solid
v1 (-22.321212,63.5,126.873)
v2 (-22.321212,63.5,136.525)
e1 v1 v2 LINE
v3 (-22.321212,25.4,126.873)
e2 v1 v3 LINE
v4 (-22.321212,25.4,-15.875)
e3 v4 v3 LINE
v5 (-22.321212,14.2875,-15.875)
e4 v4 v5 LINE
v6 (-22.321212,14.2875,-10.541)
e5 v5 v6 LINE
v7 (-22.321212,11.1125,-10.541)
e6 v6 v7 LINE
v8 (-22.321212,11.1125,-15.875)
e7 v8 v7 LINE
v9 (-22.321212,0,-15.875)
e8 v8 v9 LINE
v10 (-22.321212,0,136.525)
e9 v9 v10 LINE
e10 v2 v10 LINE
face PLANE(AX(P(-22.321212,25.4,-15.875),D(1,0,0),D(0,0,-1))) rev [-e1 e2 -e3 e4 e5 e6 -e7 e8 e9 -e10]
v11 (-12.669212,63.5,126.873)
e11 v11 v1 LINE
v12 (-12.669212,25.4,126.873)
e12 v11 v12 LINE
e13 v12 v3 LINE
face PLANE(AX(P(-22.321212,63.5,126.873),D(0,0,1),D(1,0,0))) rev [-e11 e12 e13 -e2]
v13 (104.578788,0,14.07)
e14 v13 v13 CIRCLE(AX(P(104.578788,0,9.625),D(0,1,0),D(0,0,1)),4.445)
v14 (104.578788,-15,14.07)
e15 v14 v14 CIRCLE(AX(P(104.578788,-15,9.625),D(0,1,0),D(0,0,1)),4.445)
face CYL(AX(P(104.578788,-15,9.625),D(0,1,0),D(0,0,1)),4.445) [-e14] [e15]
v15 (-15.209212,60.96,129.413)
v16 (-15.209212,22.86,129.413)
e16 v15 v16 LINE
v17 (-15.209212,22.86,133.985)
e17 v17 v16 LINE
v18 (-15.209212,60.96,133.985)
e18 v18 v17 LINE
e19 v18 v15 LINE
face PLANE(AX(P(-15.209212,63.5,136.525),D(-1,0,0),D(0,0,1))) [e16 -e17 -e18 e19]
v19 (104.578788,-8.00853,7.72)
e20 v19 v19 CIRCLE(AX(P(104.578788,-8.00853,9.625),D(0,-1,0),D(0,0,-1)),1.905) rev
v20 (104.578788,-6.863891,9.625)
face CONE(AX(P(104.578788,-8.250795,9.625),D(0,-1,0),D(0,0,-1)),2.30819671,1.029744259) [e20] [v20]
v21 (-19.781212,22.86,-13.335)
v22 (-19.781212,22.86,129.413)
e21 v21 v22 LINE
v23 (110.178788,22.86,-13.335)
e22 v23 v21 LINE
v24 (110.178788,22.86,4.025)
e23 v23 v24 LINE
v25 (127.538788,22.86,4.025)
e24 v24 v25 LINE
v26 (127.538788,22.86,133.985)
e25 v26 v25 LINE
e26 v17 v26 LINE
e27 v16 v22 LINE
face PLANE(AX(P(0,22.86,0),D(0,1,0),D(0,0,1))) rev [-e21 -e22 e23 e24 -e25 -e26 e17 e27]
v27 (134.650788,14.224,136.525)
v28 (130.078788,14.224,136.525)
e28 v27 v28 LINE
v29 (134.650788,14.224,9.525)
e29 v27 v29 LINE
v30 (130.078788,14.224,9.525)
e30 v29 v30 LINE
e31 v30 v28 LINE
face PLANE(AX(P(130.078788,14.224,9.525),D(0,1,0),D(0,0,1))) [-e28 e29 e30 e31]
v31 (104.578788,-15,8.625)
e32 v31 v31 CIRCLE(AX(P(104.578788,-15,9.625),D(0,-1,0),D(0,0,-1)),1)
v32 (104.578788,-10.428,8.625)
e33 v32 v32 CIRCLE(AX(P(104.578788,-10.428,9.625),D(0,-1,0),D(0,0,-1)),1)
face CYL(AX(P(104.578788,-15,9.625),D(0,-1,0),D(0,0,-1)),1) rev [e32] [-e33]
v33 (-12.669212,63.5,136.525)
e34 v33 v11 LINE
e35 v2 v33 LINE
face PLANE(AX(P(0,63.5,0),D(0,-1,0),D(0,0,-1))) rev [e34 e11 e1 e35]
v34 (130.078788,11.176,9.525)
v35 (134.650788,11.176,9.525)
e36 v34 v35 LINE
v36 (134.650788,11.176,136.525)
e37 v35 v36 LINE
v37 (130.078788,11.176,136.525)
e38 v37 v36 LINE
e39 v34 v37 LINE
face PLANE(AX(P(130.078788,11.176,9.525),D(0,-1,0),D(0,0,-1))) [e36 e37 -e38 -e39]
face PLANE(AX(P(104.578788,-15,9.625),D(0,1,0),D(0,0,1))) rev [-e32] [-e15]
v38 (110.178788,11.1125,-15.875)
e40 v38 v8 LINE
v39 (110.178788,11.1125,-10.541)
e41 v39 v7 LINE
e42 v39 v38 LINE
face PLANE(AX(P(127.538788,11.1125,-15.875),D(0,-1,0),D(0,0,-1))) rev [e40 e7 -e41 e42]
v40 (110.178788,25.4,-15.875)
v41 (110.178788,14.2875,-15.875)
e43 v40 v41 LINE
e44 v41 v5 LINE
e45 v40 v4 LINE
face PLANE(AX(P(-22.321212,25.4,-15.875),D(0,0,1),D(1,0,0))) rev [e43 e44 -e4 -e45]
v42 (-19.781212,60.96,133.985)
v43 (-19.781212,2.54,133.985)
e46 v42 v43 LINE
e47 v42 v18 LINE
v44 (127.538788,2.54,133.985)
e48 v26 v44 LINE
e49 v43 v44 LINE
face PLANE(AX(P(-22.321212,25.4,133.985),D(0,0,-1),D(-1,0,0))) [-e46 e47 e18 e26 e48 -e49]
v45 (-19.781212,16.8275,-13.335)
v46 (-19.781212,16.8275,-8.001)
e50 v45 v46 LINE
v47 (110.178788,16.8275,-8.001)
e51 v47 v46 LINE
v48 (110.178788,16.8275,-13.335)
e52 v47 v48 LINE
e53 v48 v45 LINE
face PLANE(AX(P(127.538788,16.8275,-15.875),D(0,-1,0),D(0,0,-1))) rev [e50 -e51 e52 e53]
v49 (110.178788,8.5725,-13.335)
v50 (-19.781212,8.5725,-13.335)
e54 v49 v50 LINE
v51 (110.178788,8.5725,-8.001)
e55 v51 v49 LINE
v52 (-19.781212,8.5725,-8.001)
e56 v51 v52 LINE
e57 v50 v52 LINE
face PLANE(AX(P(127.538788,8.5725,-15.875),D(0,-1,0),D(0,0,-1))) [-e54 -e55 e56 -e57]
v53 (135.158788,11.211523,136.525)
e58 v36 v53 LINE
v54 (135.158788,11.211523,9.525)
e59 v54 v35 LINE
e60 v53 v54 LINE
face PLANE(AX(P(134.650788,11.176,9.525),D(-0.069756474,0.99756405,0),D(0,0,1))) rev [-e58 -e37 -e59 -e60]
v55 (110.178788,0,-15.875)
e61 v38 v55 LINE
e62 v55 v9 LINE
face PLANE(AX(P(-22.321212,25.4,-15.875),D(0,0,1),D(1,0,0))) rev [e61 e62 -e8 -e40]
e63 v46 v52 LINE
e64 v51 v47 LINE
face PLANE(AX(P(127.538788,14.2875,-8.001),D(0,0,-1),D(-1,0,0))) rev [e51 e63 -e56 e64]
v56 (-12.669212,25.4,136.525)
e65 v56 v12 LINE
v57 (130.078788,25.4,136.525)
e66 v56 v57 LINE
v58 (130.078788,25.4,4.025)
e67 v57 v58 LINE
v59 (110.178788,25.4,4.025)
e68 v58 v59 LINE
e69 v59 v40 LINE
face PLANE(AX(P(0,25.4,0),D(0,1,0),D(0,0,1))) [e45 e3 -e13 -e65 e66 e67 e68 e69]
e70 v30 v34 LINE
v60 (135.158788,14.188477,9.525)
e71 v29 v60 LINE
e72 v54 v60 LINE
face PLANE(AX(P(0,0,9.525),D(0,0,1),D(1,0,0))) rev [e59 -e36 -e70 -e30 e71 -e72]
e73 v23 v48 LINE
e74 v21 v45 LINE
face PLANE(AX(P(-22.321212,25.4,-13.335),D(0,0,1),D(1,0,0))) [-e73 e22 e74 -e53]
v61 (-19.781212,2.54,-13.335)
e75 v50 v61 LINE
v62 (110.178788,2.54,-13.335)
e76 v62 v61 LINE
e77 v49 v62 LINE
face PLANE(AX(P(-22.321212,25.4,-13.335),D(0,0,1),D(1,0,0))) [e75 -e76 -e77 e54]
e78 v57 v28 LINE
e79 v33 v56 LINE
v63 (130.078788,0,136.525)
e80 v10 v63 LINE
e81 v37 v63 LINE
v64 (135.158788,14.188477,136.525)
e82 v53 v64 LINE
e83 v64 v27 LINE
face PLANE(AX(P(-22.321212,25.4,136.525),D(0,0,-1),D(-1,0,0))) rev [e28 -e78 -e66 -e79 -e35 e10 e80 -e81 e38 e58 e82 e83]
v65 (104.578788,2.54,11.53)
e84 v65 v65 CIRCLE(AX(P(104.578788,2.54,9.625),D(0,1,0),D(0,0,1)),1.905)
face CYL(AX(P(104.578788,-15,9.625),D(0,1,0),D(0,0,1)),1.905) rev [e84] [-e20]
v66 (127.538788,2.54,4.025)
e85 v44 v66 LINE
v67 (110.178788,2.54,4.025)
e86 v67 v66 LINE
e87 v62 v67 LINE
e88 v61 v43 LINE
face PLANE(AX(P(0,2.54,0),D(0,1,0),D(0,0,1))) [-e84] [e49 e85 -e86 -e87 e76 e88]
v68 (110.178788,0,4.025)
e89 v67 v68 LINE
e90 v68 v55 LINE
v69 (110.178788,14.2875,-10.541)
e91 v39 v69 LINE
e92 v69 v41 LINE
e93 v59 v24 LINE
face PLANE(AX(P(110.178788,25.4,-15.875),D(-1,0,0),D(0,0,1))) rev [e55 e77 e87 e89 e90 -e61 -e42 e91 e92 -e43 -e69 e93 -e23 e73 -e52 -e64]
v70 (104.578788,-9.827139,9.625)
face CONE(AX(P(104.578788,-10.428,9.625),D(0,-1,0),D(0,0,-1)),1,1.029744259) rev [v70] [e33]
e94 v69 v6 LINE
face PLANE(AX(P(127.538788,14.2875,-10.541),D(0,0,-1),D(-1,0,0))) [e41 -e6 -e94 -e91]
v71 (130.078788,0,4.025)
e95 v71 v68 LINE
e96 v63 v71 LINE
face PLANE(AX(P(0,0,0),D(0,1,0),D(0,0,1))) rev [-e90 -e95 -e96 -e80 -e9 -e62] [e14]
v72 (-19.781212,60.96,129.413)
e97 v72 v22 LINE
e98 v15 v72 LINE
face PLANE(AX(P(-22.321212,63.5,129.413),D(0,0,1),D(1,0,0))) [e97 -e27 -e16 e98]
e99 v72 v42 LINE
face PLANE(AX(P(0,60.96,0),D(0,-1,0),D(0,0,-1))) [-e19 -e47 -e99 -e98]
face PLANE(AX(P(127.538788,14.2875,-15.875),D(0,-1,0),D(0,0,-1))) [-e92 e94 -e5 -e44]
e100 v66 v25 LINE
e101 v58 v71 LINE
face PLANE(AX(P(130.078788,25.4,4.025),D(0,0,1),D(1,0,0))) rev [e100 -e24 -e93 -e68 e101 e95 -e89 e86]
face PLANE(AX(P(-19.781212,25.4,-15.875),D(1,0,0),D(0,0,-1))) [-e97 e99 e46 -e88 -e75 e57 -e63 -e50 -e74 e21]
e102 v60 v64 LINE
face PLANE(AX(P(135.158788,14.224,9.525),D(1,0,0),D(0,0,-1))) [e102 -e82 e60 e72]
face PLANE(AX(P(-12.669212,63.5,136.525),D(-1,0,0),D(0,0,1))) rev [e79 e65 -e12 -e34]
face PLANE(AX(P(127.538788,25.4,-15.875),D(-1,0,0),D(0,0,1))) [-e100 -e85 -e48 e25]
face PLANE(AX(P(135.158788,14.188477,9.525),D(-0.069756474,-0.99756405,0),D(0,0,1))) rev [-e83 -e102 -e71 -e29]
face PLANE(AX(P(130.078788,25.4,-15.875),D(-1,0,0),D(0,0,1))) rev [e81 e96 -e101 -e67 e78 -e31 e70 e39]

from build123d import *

# Parameters (mm, degrees)
SKETCH1_W                 = 152.4
SKETCH1_H                 = 152.4
BOSS_EXTRUDE2_DEPTH       = 25.4
SKETCH2_W                 = 9.652
SKETCH2_H                 = 9.652
BOSS_EXTRUDE3_DEPTH       = 38.1
SKETCH3_W                 = 5.08
SKETCH3_H                 = 3.048
BOSS_EXTRUDE4_DEPTH       = 127
CHAMFER1_SIZE             = 0.508
CHAMFER1_SIZE2            = 0.03552282
CHAMFER2_SIZE             = 0.508
CHAMFER2_SIZE2            = 0.03552282
SKETCH4_W                 = 5.334
SKETCH4_H                 = 3.175
CUT_EXTRUDE3_DEPTH        = 149.86
SKETCH5_R                 = 4.445
BOSS_EXTRUDE5_DEPTH       = 15
F_2_0MM_DOWEL_HOLE1_D     = 2
F_2_0MM_DOWEL_HOLE1_DEPTH = 4.572
F_2_0MM_DOWEL_HOLE1_TIP   = 0.600860619
SHELL1_START              = 2.54
SHELL1_OUTLINE_W          = 147.32
SHELL1_OUTLINE_H          = 141.986
SHELL1_DEPTH              = 20.32
SHELL1_2_OUTLINE_W        = 147.32
SHELL1_2_OUTLINE_H        = 5.334
SHELL1_2_DEPTH            = 6.0325
SHELL1_START_2            = 16.8275
SHELL1_3_OUTLINE_W        = 147.32
SHELL1_3_OUTLINE_H        = 5.334
SHELL1_3_DEPTH            = 6.0325
SHELL1_START_3            = 22.86
SHELL1_4_OUTLINE_W        = 4.572
SHELL1_4_OUTLINE_H        = 4.572
SHELL1_4_DEPTH            = 38.1
SHELL1_START_4            = -6.863890452
SHELL1_5_OUTLINE_R        = 1.905
SHELL1_5_DEPTH            = 9.403890452
SKETCH8_W                 = 19.9
SKETCH8_H                 = 19.9
CUT_EXTRUDE4_DEPTH        = 25.4


with BuildPart() as part:
    # Sketch1 → Boss-Extrude2 (new body)
    with BuildSketch(Plane(origin=(0, 0, 0), x_dir=(1, 0, 0), z_dir=(0, 1, 0))):
        with Locations((53.878787879, -60.325)):
            Rectangle(SKETCH1_W, SKETCH1_H)
    extrude(amount=BOSS_EXTRUDE2_DEPTH)

    # Sketch2 → Boss-Extrude3 (add)
    with BuildSketch(Plane(origin=(0, 25.4, 0), x_dir=(1, 0, 0), z_dir=(0, 1, 0))):
        with Locations((-17.495212121, -131.699)):
            Rectangle(SKETCH2_W, SKETCH2_H)
    extrude(amount=BOSS_EXTRUDE3_DEPTH)

    # Sketch3 → Boss-Extrude4 (add)
    with BuildSketch(Plane.XY.offset(136.525)):
        with Locations((132.618787879, 12.7)):
            Rectangle(SKETCH3_W, SKETCH3_H)
    extrude(amount=-BOSS_EXTRUDE4_DEPTH)

    # Chamfer1
    chamfer1_edges = [part.edges().sort_by_distance(p)[0] for p in [
        (135.158787879, 14.224, 73.025),
    ]]
    chamfer1_side = [part.faces().sort_by_distance(p)[0] for p in [
        (132.618787879, 14.224, 73.025),
    ]]
    chamfer(chamfer1_edges, length=CHAMFER1_SIZE, length2=CHAMFER1_SIZE2, reference=chamfer1_side[0])

    # Chamfer2
    chamfer2_edges = [part.edges().sort_by_distance(p)[0] for p in [
        (135.158787879, 11.176, 73.025),
    ]]
    chamfer2_side = [part.faces().sort_by_distance(p)[0] for p in [
        (132.618787879, 11.176, 73.025),
    ]]
    chamfer(chamfer2_edges, length=CHAMFER2_SIZE, length2=CHAMFER2_SIZE2, reference=chamfer2_side[0])

    # Sketch4 → Cut-Extrude3 (cut)
    with BuildSketch(Plane.ZY.offset(22.321212121)):
        with Locations((-13.208, 12.7)):
            Rectangle(SKETCH4_W, SKETCH4_H)
    extrude(amount=-CUT_EXTRUDE3_DEPTH, mode=Mode.SUBTRACT)

    # Sketch5 → Boss-Extrude5 (add)
    with BuildSketch(Plane(origin=(0, 0, 0), x_dir=(1, 0, 0), z_dir=(0, 1, 0))):
        with Locations(Location((104.578787879, -9.625, 0), (0, 0, 270))):
            Circle(SKETCH5_R)
    extrude(amount=-BOSS_EXTRUDE5_DEPTH)

    # Ø2.0mm Dowel Hole1
    with Locations(Plane(origin=(0, -15, 0), x_dir=(-1, 0, 0), z_dir=(0, -1, 0))):
        with Locations((-104.578787879, -9.625)):
            Hole(F_2_0MM_DOWEL_HOLE1_D / 2, depth=F_2_0MM_DOWEL_HOLE1_DEPTH)
            with Locations((0, 0, -(F_2_0MM_DOWEL_HOLE1_DEPTH + F_2_0MM_DOWEL_HOLE1_TIP / 2))):  # 118° drill point
                Cone(0, F_2_0MM_DOWEL_HOLE1_D / 2, F_2_0MM_DOWEL_HOLE1_TIP, mode=Mode.SUBTRACT)

    # Shell1: read off the stored shape, not the designer's step
    # Shell1 outline → Shell1 (cut)
    with BuildSketch(Plane(origin=(0, 0, 0), x_dir=(1, 0, 0), z_dir=(0, 1, 0)).offset(SHELL1_START)):
        with Locations((53.878787879, -62.992)):
            Rectangle(SHELL1_OUTLINE_W, SHELL1_OUTLINE_H)
    extrude(amount=SHELL1_DEPTH, mode=Mode.SUBTRACT)

    # Shell1 2 outline → Shell1 2 (cut)
    with BuildSketch(Plane(origin=(0, 0, 0), x_dir=(1, 0, 0), z_dir=(0, 1, 0)).offset(SHELL1_START)):
        with Locations((53.878787879, 10.668)):
            Rectangle(SHELL1_2_OUTLINE_W, SHELL1_2_OUTLINE_H)
    extrude(amount=SHELL1_2_DEPTH, mode=Mode.SUBTRACT)

    # Shell1 3 outline → Shell1 3 (cut)
    with BuildSketch(Plane(origin=(0, 0, 0), x_dir=(1, 0, 0), z_dir=(0, 1, 0)).offset(SHELL1_START_2)):
        with Locations((53.878787879, 10.668)):
            Rectangle(SHELL1_3_OUTLINE_W, SHELL1_3_OUTLINE_H)
    extrude(amount=SHELL1_3_DEPTH, mode=Mode.SUBTRACT)

    # Shell1 4 outline → Shell1 4 (cut)
    with BuildSketch(Plane(origin=(0, 0, 0), x_dir=(1, 0, 0), z_dir=(0, 1, 0)).offset(SHELL1_START_3)):
        with Locations((-17.495212121, -131.699)):
            Rectangle(SHELL1_4_OUTLINE_W, SHELL1_4_OUTLINE_H)
    extrude(amount=SHELL1_4_DEPTH, mode=Mode.SUBTRACT)

    # Shell1 5 outline → Shell1 5 (cut)
    with BuildSketch(Plane(origin=(0, 0, 0), x_dir=(1, 0, 0), z_dir=(0, 1, 0)).offset(SHELL1_START_4)):
        with Locations((104.578787879, -9.625)):
            Circle(SHELL1_5_OUTLINE_R)
    extrude(amount=SHELL1_5_DEPTH, mode=Mode.SUBTRACT)

    # Shell1 6 outline → Shell1 6 (revolve, cut)
    with BuildSketch(Plane(origin=(104.578787879, 0, 9.625), x_dir=(1, 0, 0), z_dir=(0, 0, 1))):
        Polygon((0, -6.863890552), (1.905, -8.008530031), (1.905, -6.863890452), align=None)
    revolve(axis=Axis((104.578787879, 0, 9.625), (0, 1, 0)), mode=Mode.SUBTRACT)

    # Sketch8 → Cut-Extrude4 (cut)
    with BuildSketch(Plane.XZ):
        with Locations((120.128787879, -5.925)):
            Rectangle(SKETCH8_W, SKETCH8_H)
    extrude(amount=-CUT_EXTRUDE4_DEPTH, mode=Mode.SUBTRACT)


solid = part.part
